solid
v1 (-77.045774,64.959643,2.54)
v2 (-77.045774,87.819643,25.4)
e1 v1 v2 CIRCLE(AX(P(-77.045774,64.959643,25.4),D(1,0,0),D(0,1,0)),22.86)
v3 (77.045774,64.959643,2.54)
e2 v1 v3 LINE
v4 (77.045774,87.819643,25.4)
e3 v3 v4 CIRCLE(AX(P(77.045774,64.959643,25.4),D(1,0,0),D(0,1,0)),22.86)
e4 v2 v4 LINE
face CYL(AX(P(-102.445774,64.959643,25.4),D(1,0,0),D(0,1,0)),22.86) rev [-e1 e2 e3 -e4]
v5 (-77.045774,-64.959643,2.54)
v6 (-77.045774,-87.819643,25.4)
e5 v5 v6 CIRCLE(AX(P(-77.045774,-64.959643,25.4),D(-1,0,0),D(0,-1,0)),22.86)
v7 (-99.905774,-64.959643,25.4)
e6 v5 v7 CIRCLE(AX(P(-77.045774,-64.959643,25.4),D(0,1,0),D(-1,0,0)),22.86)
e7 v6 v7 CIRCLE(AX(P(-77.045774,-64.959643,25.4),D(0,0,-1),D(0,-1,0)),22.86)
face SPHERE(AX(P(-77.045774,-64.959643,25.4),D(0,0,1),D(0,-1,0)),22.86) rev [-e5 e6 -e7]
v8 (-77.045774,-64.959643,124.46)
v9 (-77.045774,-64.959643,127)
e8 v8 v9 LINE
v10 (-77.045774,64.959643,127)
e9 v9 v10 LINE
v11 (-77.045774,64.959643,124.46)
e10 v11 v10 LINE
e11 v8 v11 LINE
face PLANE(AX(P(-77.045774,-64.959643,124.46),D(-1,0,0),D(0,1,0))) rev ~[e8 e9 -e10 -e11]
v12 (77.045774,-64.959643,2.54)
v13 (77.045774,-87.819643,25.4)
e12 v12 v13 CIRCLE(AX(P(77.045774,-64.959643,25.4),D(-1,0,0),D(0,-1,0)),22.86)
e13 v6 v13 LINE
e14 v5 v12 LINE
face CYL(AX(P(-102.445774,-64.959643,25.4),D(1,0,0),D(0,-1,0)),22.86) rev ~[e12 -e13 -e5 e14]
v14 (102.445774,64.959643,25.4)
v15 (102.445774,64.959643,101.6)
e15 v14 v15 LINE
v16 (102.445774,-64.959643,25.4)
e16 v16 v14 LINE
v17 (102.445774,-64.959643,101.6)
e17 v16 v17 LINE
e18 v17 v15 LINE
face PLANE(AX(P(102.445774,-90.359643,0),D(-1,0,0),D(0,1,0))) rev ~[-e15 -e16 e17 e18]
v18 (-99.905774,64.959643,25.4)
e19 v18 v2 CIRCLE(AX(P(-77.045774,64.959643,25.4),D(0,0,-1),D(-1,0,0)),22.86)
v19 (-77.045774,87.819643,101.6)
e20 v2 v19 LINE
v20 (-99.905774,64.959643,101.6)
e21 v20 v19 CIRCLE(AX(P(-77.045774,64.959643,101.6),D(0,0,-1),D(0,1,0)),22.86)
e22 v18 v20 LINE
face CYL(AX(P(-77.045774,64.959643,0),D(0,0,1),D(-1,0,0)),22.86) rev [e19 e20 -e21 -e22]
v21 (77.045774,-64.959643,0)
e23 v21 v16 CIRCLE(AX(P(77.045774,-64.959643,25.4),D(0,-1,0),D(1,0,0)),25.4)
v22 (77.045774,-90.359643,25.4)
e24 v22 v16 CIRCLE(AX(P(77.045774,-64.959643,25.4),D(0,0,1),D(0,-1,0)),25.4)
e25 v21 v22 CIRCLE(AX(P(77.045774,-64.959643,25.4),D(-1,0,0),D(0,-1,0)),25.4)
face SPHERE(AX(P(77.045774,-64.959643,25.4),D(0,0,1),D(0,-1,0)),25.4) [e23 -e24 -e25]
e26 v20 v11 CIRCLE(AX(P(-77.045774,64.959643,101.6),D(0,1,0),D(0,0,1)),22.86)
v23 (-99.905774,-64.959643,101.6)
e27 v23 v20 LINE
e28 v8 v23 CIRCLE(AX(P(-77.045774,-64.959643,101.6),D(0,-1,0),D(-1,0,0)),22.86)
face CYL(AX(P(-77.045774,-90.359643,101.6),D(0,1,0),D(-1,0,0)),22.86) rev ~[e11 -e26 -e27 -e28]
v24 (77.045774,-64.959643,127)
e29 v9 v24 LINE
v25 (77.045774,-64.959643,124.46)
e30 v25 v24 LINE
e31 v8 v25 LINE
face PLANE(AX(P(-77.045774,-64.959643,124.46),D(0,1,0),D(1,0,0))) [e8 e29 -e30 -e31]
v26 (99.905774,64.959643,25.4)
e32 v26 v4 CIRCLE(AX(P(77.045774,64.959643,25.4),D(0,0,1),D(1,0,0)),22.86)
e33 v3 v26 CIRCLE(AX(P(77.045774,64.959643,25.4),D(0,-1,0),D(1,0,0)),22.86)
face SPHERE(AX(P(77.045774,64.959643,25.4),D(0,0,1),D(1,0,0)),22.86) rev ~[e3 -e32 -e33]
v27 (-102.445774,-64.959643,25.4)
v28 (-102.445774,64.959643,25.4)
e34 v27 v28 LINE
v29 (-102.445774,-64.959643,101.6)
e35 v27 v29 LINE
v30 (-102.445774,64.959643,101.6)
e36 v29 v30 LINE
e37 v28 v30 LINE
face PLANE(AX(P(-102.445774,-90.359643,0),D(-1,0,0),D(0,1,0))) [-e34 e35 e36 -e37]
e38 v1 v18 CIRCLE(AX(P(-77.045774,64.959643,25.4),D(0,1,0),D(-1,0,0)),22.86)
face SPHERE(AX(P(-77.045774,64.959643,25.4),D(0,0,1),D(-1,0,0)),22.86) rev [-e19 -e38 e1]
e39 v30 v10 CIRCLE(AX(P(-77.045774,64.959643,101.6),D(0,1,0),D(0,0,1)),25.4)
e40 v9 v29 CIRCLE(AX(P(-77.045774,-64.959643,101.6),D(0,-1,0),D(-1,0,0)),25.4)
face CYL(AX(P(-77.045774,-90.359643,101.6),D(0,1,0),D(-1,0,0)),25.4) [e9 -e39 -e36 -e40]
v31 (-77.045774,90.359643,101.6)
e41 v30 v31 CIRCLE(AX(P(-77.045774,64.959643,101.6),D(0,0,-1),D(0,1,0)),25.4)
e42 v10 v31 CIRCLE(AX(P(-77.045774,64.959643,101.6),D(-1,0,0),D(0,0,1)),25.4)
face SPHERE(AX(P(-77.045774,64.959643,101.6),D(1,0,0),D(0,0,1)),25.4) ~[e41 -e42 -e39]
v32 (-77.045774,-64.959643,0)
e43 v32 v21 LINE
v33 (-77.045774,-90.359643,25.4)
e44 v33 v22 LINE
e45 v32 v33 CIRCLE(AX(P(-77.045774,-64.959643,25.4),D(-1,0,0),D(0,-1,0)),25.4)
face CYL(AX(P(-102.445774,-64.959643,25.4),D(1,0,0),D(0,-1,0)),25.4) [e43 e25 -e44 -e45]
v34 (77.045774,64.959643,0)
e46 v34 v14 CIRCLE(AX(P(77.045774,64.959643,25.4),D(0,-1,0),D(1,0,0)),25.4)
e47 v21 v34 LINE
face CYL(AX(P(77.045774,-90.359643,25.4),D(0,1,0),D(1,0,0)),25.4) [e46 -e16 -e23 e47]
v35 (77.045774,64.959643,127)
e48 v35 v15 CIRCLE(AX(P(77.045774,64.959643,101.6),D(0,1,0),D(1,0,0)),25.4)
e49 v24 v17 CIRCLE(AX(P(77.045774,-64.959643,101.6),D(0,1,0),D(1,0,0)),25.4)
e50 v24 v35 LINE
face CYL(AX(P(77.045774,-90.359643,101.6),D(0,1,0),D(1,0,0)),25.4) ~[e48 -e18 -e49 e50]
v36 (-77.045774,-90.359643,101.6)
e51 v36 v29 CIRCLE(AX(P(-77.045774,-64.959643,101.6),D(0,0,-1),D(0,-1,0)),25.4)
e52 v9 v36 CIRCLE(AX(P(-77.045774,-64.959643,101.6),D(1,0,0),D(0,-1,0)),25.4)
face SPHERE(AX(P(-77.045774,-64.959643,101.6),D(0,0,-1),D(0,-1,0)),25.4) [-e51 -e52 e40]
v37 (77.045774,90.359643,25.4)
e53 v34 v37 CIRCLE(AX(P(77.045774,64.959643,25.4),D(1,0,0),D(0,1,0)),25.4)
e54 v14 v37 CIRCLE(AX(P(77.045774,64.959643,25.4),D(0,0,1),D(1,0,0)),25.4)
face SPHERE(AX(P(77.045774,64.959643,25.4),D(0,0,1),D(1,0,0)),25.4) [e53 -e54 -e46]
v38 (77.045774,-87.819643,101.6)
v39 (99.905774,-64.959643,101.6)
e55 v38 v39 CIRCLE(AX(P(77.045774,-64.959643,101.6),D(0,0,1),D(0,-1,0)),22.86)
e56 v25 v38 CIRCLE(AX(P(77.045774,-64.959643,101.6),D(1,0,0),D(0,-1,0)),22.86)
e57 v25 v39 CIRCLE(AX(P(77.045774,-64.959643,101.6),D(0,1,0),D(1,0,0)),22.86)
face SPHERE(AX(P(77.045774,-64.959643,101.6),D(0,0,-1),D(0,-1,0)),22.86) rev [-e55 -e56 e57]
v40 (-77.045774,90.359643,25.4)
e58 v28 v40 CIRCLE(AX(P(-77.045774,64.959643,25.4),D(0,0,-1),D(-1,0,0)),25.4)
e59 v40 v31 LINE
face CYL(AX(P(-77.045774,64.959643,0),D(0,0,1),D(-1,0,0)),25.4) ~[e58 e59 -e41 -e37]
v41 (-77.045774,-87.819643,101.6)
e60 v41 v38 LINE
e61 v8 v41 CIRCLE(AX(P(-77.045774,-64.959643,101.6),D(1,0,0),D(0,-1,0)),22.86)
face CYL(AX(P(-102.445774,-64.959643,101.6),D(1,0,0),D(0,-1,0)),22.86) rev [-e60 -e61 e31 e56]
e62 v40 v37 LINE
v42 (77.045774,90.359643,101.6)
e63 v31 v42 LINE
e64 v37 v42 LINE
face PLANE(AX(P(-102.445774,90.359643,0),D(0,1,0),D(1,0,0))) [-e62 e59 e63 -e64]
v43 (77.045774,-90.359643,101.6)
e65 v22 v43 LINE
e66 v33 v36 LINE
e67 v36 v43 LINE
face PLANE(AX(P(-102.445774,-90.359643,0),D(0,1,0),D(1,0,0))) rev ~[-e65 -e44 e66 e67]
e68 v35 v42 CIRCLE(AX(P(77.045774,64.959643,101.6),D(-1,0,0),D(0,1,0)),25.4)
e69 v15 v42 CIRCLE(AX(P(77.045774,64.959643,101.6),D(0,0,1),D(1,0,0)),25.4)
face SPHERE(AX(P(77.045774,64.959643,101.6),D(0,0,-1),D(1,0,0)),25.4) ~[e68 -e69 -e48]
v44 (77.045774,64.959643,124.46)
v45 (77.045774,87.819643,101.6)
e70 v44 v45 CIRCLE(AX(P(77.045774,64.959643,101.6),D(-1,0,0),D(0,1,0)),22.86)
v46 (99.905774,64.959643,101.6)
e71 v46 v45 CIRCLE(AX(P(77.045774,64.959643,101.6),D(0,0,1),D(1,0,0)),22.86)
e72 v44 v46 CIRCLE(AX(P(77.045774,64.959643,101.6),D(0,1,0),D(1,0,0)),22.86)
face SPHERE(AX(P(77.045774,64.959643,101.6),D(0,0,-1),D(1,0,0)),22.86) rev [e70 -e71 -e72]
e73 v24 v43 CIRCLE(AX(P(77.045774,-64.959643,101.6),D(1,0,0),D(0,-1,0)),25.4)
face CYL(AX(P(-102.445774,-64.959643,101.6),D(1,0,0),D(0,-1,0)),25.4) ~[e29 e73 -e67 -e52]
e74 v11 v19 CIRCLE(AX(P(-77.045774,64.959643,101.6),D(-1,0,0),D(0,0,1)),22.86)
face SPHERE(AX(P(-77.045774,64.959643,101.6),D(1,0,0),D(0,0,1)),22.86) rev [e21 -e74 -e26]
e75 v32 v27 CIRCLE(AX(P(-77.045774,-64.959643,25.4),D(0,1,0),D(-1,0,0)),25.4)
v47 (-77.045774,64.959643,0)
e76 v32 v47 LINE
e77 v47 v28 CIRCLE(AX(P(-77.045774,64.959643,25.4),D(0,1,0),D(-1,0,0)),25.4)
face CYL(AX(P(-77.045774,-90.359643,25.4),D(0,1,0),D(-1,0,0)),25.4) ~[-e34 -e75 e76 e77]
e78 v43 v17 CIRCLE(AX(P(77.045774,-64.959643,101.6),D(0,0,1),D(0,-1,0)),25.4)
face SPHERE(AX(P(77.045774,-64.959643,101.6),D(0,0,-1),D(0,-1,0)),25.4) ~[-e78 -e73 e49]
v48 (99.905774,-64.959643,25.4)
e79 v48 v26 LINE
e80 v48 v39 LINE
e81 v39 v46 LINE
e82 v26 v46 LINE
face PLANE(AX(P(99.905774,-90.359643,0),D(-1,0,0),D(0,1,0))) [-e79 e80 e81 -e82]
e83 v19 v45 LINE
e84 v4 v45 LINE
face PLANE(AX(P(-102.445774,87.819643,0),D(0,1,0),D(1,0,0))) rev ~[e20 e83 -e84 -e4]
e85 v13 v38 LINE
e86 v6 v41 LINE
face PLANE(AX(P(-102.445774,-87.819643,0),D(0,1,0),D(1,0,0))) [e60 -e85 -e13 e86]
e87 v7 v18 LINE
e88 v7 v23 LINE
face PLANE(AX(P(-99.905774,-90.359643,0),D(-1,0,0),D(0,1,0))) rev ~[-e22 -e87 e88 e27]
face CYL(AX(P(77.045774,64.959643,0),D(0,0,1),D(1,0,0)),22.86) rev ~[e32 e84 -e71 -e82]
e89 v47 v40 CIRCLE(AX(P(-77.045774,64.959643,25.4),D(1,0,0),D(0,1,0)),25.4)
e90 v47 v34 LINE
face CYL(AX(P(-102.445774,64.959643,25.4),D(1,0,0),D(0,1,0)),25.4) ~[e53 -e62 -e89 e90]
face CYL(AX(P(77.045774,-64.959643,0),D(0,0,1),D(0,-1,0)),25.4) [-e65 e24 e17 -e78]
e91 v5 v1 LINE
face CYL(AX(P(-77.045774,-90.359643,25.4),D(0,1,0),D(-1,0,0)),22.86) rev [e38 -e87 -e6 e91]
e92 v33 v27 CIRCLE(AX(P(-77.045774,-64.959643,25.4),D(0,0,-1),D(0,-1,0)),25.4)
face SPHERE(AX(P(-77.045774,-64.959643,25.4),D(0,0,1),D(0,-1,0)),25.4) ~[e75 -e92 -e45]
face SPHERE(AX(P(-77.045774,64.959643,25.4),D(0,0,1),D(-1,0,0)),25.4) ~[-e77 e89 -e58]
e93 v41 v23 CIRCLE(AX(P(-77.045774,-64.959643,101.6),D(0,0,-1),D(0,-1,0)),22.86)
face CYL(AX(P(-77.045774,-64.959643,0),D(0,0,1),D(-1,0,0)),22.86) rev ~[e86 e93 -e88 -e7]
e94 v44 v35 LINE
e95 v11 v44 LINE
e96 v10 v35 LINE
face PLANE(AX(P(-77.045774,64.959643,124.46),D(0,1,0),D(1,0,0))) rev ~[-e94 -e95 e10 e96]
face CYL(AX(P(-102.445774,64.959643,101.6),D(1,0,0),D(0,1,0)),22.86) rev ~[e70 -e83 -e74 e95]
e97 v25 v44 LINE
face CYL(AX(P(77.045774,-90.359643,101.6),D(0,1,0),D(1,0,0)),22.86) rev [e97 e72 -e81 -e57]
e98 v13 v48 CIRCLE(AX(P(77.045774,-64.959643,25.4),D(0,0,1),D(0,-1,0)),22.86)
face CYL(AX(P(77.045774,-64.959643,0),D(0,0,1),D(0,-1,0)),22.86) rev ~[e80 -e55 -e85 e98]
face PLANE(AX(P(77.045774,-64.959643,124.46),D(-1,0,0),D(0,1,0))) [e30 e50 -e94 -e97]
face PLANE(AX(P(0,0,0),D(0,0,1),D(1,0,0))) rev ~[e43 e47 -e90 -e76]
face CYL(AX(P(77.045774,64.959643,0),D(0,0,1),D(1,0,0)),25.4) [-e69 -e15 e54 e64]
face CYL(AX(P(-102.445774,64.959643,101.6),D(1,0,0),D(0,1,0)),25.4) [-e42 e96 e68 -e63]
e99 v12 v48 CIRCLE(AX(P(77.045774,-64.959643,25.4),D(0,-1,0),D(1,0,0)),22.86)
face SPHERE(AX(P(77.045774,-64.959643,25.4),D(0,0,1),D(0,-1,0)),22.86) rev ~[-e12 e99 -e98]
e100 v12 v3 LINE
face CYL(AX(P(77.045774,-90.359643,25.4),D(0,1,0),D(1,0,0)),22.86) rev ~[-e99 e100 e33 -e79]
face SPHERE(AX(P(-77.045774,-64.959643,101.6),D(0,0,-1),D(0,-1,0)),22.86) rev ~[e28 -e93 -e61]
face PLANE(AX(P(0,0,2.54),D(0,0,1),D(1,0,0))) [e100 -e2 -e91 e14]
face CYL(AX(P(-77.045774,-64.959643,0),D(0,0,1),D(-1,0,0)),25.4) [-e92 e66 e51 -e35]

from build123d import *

# Parameters (mm, degrees)
F0_W     = 204.8915475607
F0_H     = 180.7192862034
F1_DEPTH = 127
F2_R     = 25.4
F3_T     = -2.54


# Not quite as in the source:
# - a shell that OpenCascade refuses in one call is made with other operations: the cavity is built on its own and cut out


with BuildPart() as f1:
    # F0 (on Top) → F1 (new body)
    with BuildSketch(Plane.XY):
        Rectangle(F0_W, F0_H)
    extrude(amount=F1_DEPTH)

    # F2
    f2_edges = [f1.edges().sort_by_distance(p)[0] for p in [
        (-102.445774, -90.359643, 63.5),
        (102.445774, -90.359643, 63.5),
        (0, -90.359643, 0),
        (0, -90.359643, 127),
        (102.445774, 90.359643, 63.5),
        (102.445774, 0, 0),
        (102.445774, 0, 127),
        (0, 90.359643, 127),
        (-102.445774, 0, 127),
        (-102.445774, 90.359643, 63.5),
        (-102.445774, 0, 0),
        (0, 90.359643, 0),
    ]]
    fillet(f2_edges, radius=F2_R)

    # F3: a shell. OpenCascade refuses it in one call, so the cavity is built on its own and cut out:
    # the body offset inwards by the wall thickness, plus a prism from it out through each open face.
    f3_core = offset(f1.part, amount=F3_T, mode=Mode.PRIVATE)
    f3_exits = [f3_core.faces().sort_by_distance(p)[0] for p in [
        (0, 0, 124.46),
    ]]
    add(f3_core, mode=Mode.SUBTRACT)
    extrude(f3_exits, amount=-F3_T, mode=Mode.SUBTRACT)


solid = f1.part
